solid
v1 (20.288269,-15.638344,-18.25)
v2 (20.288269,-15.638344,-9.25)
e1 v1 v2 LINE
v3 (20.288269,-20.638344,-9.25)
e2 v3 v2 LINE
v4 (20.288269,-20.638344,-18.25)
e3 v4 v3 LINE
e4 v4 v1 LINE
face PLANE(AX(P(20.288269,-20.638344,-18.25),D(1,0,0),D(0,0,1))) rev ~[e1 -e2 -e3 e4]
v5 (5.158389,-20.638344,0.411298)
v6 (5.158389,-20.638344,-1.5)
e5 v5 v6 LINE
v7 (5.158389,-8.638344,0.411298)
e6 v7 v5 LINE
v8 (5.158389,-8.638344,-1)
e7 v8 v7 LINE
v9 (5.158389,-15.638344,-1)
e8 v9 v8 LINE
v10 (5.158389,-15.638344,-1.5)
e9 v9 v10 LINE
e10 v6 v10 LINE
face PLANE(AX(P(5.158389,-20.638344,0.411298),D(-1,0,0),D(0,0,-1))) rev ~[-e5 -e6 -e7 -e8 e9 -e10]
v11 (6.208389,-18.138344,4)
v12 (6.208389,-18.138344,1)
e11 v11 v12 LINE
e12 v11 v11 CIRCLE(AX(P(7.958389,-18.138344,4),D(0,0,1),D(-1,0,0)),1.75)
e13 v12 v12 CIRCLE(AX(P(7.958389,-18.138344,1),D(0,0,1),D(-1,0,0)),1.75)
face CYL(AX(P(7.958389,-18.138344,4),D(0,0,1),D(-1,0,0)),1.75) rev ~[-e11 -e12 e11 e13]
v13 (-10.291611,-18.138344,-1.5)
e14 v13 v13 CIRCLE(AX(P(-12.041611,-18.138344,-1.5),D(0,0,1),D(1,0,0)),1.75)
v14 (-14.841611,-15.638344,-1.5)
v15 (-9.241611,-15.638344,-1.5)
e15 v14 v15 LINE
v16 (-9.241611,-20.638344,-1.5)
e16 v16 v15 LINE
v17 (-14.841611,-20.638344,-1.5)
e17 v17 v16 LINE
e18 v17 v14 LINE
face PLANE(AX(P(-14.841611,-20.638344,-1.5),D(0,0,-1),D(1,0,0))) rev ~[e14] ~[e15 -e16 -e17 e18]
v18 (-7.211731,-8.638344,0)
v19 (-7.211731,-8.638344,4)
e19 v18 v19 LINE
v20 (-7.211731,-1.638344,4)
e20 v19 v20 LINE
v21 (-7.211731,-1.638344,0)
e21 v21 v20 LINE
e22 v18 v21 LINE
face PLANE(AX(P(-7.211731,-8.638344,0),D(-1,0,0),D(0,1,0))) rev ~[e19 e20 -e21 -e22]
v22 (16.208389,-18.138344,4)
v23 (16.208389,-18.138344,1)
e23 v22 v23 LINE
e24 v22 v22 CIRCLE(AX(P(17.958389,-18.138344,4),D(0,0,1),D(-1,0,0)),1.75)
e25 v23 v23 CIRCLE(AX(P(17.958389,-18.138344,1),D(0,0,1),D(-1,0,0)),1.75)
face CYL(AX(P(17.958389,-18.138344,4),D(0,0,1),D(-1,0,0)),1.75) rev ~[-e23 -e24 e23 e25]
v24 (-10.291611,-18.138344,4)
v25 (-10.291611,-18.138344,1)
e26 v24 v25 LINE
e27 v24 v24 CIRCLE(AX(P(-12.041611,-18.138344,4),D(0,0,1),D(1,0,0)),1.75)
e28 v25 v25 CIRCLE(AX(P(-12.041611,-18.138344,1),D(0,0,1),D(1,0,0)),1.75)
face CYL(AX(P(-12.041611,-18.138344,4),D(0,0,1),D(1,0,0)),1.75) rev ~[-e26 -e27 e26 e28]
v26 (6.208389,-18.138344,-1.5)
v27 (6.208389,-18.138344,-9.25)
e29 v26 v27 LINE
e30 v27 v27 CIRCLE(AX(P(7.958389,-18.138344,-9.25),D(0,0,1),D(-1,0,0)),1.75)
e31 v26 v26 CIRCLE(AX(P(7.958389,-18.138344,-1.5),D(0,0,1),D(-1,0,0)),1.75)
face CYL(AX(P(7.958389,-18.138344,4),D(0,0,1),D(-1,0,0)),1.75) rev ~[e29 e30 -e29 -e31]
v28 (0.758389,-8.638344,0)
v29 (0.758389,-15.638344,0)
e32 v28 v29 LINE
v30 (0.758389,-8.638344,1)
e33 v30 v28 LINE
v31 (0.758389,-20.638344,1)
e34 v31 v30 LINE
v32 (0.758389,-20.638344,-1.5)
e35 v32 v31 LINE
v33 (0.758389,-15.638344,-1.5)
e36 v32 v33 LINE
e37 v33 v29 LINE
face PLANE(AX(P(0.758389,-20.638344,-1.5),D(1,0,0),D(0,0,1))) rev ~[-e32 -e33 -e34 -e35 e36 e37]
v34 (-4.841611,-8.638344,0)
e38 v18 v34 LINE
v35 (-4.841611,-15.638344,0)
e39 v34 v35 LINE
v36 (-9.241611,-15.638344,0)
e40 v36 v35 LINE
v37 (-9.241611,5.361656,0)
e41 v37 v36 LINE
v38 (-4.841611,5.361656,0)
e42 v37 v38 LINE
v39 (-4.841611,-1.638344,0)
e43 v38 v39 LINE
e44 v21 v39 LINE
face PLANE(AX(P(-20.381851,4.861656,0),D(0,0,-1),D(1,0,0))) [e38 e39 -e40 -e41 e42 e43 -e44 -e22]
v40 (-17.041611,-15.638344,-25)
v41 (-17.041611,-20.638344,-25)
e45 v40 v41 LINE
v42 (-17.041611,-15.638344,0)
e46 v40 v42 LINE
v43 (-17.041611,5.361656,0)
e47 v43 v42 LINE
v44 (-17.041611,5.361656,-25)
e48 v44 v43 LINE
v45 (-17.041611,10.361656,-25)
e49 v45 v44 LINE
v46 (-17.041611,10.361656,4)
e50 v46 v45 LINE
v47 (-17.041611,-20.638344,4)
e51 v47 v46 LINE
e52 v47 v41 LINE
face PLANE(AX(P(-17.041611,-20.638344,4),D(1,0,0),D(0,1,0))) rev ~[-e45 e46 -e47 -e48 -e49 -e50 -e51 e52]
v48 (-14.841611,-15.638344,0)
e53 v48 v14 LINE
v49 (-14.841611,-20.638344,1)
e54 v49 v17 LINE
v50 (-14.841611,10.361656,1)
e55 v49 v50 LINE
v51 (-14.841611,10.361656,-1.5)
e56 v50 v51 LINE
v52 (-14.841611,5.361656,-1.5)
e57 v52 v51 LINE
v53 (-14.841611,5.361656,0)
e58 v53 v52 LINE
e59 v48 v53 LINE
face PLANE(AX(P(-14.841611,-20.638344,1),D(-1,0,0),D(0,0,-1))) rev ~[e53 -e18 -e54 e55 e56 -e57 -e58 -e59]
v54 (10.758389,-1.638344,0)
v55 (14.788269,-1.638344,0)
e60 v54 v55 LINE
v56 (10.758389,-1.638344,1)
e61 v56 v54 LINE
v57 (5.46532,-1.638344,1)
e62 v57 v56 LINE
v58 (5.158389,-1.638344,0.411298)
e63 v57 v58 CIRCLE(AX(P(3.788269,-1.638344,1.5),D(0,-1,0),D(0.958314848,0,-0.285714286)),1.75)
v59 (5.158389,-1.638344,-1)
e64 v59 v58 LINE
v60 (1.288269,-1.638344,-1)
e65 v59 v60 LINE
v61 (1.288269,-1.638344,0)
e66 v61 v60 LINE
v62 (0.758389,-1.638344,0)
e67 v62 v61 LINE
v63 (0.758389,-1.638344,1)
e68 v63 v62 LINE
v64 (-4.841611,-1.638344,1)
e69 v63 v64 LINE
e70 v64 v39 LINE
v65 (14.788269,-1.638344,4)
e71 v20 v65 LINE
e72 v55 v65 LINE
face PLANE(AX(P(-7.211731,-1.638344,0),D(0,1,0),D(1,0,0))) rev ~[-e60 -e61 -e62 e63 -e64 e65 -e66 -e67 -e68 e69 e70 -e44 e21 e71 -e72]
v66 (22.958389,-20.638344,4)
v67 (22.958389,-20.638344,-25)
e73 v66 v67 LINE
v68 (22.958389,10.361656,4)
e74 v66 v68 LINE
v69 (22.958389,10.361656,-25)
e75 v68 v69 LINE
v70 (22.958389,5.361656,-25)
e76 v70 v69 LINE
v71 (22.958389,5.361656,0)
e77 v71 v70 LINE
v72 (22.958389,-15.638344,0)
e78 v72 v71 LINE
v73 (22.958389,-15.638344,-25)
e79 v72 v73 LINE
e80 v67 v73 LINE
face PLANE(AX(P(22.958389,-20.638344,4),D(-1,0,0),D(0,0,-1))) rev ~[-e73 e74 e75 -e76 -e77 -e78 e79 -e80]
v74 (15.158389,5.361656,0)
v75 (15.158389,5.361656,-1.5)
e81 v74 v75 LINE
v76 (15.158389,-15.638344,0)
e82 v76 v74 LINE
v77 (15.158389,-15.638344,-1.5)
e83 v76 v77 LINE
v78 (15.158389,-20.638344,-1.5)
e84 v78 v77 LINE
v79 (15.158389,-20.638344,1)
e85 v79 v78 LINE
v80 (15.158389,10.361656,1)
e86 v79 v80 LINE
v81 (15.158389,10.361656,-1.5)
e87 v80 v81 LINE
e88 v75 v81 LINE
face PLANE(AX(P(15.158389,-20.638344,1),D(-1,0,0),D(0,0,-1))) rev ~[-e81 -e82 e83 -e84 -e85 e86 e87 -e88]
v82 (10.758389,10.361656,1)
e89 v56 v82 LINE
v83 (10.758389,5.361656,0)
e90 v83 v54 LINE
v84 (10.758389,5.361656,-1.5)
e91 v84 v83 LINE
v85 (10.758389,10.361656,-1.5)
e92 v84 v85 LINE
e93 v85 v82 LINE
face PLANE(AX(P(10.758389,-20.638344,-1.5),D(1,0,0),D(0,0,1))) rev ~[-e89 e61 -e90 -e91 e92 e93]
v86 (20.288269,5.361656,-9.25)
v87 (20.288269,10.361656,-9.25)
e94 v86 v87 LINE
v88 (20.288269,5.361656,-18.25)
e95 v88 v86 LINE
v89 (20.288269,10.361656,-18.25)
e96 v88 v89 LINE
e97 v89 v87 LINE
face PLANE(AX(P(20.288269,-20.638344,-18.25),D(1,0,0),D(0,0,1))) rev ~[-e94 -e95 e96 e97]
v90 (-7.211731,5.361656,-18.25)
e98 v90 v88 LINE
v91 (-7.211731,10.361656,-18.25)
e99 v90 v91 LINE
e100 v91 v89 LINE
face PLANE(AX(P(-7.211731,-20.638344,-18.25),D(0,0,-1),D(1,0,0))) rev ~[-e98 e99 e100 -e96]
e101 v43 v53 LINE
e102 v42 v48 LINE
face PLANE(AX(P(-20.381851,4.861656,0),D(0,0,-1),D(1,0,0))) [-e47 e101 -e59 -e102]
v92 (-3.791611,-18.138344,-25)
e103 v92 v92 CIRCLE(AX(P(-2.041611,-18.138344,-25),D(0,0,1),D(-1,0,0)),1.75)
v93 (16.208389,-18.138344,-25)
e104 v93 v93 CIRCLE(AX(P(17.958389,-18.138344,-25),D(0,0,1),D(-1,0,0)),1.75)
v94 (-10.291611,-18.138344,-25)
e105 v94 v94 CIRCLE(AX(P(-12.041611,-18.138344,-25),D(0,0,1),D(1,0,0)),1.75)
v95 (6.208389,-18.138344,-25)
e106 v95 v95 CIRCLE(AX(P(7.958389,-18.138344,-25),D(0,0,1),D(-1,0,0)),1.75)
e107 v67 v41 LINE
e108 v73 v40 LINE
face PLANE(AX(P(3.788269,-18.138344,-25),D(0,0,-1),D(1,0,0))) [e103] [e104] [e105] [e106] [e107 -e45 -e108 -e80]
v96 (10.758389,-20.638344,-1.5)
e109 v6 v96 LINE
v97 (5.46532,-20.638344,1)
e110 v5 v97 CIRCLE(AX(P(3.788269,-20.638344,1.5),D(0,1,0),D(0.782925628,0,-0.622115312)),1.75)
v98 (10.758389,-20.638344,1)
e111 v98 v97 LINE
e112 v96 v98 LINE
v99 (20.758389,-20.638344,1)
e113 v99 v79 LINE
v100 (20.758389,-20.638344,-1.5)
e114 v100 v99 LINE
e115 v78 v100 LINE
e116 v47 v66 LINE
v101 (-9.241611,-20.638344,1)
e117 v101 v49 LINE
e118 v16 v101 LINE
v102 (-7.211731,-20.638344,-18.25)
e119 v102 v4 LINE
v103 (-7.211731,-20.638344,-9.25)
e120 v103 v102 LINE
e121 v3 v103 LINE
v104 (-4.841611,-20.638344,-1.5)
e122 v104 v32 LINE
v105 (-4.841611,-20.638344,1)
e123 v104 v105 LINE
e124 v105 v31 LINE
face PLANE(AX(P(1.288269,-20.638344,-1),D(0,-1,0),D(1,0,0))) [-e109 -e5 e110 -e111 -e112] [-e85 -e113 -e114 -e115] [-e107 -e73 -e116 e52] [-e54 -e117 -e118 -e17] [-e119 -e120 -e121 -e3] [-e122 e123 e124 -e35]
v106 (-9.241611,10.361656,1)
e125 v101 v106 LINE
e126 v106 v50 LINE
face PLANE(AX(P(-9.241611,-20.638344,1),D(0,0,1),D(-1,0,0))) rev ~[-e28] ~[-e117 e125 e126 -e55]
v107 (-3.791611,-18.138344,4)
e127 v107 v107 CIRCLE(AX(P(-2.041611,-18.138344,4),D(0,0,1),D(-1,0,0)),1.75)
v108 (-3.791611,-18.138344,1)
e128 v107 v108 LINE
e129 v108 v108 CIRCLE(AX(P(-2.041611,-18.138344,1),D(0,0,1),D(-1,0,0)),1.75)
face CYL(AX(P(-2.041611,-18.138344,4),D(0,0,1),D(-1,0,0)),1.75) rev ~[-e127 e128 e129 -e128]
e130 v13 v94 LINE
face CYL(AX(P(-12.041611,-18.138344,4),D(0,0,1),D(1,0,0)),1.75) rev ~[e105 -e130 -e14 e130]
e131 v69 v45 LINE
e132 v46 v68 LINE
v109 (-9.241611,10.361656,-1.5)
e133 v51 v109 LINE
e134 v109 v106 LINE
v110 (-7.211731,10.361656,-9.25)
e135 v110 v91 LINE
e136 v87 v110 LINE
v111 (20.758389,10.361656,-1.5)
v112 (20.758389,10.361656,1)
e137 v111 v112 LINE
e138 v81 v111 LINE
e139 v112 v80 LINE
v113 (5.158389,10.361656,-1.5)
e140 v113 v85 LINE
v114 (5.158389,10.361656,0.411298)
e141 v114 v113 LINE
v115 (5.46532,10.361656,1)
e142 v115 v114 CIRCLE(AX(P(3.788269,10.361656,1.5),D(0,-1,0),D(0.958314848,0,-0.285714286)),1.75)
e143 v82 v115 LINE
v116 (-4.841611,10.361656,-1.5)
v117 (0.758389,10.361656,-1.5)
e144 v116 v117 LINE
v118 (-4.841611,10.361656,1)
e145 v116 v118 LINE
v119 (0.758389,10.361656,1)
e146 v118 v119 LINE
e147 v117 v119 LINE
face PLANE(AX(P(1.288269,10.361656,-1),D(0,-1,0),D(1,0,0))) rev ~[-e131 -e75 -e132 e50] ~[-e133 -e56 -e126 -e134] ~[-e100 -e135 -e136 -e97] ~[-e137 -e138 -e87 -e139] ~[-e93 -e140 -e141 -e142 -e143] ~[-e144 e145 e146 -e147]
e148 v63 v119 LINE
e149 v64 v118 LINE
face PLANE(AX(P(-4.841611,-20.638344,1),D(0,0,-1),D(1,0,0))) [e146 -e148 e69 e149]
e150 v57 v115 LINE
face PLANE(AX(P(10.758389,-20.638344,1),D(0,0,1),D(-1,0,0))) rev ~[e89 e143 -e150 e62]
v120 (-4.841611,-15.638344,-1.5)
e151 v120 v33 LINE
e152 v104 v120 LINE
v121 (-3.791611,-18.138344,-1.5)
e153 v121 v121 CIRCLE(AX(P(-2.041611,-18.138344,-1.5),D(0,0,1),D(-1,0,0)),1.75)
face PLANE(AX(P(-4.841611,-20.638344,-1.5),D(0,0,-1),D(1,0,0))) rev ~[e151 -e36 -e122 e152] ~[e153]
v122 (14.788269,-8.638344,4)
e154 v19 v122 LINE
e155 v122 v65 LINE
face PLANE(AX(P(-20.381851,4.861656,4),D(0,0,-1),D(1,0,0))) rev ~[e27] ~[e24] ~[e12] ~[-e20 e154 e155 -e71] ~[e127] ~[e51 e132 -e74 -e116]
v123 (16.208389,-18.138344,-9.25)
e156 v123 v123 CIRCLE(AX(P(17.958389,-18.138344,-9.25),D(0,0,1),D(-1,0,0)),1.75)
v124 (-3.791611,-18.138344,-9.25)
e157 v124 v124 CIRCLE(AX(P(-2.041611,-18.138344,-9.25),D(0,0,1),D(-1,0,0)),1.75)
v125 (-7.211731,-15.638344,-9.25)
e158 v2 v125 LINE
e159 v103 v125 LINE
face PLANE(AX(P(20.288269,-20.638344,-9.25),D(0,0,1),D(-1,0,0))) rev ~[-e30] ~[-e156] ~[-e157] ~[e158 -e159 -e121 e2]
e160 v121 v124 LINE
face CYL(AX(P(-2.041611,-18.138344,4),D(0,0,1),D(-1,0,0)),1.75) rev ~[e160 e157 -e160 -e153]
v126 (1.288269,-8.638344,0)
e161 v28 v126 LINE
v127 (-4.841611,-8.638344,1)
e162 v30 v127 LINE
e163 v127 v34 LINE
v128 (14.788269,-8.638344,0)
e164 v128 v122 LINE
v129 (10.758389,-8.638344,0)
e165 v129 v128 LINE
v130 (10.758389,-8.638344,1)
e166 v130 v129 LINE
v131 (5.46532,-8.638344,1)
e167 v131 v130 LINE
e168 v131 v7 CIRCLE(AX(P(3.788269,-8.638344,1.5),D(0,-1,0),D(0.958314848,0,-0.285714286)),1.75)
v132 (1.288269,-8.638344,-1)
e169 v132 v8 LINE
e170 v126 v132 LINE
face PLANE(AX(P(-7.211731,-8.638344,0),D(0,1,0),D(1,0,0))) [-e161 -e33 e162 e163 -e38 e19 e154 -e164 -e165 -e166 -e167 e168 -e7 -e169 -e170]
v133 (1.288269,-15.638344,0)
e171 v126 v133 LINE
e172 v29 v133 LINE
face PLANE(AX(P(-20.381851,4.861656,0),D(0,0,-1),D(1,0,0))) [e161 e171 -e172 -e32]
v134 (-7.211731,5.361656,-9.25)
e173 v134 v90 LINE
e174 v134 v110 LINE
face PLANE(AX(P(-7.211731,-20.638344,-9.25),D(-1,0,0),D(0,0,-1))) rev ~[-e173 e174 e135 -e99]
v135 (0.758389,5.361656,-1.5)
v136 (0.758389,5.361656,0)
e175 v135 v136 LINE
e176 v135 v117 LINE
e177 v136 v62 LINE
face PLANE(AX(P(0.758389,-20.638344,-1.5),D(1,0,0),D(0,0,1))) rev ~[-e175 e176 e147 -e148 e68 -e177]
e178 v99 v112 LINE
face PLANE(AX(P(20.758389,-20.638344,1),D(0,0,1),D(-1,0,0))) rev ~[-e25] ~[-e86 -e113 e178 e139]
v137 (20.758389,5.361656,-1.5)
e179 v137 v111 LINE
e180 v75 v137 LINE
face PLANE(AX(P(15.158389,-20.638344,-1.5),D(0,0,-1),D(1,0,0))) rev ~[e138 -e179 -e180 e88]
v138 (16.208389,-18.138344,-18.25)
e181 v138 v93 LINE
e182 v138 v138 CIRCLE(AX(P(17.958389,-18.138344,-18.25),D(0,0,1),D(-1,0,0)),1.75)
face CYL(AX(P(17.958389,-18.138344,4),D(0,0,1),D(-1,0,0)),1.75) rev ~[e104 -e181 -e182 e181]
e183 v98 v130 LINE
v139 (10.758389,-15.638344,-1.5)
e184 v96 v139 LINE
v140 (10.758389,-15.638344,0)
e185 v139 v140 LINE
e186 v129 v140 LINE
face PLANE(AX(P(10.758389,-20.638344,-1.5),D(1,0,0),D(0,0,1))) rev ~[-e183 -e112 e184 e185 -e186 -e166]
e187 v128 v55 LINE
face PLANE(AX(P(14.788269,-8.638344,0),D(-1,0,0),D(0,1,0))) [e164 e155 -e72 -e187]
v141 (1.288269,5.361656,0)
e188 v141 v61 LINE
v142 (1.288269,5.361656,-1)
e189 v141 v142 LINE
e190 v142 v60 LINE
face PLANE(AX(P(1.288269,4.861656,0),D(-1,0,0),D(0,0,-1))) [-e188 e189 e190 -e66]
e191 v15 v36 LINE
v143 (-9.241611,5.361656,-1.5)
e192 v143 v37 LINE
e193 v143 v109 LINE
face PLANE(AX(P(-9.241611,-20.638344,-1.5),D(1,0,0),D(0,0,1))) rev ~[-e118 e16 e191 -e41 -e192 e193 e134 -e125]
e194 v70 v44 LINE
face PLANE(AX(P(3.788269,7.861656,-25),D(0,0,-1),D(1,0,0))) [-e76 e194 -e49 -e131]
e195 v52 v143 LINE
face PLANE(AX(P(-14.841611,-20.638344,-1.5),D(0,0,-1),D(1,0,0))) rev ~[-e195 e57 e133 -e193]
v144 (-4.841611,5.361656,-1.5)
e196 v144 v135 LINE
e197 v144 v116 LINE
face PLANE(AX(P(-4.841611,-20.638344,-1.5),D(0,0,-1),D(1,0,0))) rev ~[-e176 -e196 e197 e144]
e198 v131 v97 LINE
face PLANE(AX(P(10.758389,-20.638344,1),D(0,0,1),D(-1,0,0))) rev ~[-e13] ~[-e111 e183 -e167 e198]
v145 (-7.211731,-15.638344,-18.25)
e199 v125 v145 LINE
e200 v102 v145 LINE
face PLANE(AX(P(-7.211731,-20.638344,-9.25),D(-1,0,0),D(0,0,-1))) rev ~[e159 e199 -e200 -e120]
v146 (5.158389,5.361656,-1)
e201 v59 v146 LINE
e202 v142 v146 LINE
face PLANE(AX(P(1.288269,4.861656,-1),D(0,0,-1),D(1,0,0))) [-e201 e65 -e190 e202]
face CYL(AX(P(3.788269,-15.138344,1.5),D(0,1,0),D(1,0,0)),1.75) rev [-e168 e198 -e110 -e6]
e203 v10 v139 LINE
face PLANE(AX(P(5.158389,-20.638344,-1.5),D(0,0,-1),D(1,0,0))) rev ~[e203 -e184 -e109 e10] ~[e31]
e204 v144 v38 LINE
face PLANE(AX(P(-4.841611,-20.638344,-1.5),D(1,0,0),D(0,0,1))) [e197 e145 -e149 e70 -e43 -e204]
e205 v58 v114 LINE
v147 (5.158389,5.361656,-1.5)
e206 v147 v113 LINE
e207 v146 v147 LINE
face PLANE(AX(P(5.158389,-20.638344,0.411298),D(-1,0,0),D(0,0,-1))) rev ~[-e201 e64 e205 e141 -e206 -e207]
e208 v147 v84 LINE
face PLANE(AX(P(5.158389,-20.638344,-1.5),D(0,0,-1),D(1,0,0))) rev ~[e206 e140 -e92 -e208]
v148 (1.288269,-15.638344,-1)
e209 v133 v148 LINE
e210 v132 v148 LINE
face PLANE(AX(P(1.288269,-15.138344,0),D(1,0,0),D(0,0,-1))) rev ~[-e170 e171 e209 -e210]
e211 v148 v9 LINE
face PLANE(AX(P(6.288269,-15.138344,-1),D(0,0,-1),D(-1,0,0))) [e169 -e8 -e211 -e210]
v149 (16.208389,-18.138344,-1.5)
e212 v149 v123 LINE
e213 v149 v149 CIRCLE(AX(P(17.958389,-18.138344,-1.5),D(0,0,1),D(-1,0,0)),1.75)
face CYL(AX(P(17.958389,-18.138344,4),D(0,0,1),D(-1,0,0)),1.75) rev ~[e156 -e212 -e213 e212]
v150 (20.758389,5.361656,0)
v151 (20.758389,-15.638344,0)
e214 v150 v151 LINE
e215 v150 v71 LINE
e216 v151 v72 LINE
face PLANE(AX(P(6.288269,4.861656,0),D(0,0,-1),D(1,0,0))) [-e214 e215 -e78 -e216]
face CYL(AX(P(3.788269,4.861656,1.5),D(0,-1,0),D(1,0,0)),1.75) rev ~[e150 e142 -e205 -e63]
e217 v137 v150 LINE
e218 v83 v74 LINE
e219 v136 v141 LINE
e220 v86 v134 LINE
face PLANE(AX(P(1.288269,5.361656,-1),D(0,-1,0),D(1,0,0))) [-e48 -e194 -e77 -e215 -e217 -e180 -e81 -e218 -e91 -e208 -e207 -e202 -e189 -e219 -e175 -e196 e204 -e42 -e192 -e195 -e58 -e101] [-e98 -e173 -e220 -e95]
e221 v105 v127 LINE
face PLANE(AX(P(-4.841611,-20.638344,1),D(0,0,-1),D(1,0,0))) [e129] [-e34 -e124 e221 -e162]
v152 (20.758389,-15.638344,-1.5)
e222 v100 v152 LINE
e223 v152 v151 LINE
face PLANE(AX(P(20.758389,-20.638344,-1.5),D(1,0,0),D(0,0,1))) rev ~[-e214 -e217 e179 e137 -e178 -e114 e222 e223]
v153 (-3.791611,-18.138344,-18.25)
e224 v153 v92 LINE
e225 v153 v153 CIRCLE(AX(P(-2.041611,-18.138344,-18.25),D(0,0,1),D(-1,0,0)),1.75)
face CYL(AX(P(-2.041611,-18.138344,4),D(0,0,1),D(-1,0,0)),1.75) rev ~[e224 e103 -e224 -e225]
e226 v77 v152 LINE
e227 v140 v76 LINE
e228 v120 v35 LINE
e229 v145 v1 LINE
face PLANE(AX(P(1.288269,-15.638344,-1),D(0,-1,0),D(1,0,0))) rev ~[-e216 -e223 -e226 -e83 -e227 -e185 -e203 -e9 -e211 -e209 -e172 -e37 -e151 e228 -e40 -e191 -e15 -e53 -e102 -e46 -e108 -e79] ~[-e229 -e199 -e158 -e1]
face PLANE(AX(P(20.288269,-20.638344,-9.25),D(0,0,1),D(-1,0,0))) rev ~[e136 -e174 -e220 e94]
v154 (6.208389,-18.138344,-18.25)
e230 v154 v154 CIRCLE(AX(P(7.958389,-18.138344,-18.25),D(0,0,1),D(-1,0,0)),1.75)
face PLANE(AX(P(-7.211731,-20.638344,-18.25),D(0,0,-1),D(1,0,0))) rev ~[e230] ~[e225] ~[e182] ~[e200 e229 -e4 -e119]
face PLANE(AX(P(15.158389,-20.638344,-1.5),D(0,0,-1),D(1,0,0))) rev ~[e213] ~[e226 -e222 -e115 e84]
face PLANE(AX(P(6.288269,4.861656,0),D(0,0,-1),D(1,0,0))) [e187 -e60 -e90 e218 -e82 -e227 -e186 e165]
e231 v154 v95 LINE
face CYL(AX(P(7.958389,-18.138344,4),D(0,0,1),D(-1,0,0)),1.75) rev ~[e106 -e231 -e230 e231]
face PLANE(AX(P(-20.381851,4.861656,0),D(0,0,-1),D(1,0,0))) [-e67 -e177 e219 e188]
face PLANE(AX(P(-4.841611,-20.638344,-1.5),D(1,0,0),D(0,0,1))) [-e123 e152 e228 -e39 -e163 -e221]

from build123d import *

# Parameters (mm, degrees)
F0_W      = 48.3402396964
F0_H      = 20
F0_W_2    = 22
F0_H_2    = 7
F1_DEPTH  = 4
F3_DEPTH  = 1
F4_R      = 1.75
F5_DEPTH  = 20.001
F6_DEPTH  = 5.5
F7_DEPTH  = 5.5
F8_W      = 21.6701198482
F8_H      = 5
F9_DEPTH  = 25
F10_W     = 21.6701198482
F10_H     = 5
F11_DEPTH = 25
F12_W     = 5
F12_H     = 5
F13_DEPTH = 24
F14_W     = 5
F14_H     = 5
F15_DEPTH = 24
F16_W     = 11
F16_H     = 4.5
F17_DEPTH = 31.001
F19_DEPTH = 29.001
F18_R     = 1.75
F20_DEPTH = 10
F21_W     = 5.6
F21_H     = 2.5
F22_DEPTH = 31.001
F23_DEPTH = 29.001


# Not quite as in the source:
# - a feature names something its author has since deleted; it is built from what else it names


with BuildPart() as f1:
    # F0 (on Top) → F1 (new body)
    with BuildSketch(Plane.XY):
        with Locations((3.7882691845, -5.1383437738)):
            Rectangle(F0_W, F0_H)
        with Locations((3.7882691845, -5.1383437738)):
            Rectangle(F0_W_2, F0_H_2, mode=Mode.SUBTRACT)
    extrude(amount=F1_DEPTH)

    # F2 (on face) → F3 (join)
    with BuildSketch(Plane(origin=(0, 0, 0), x_dir=(1, 0, 0), z_dir=(0, 0, -1))):
        Polygon((6.2882691845, 1.6383437738), (3.7882691845, 1.6383437738), (1.2882691845, 1.6383437738), (1.2882691845, -4.8616562262), (6.2882691845, -4.8616562262), align=None)
        Polygon((1.2882691845, 8.6383437738), (3.7882691845, 8.6383437738), (6.2882691845, 8.6383437738), (6.2882691845, 15.1383437738), (1.2882691845, 15.1383437738), align=None)
    extrude(amount=F3_DEPTH)

    # F4 (on face) → F5 (cut, through all)
    with BuildSketch(Plane.XZ.offset(15.1383437738)):
        with Locations((3.7882691845, 1.5)):
            Circle(F4_R)
    extrude(amount=-F5_DEPTH, mode=Mode.SUBTRACT)

    # F6 (add): a face of the model
    f6_faces = [f1.faces().sort_by_distance(p)[0] for p in [
        (-19.8958693087, -15.1383437738, 2),
    ]]
    extrude(f6_faces, amount=F6_DEPTH)

    # F7 (add): a face of the model
    f7_faces = [f1.faces().sort_by_distance(p)[0] for p in [
        (27.4724076777, 4.8616562262, 2),
    ]]
    extrude(f7_faces, amount=F7_DEPTH)

    # F8 (on face) → F9 (join)
    with BuildSketch(Plane(origin=(0, 0, 0), x_dir=(1, 0, 0), z_dir=(0, 0, -1))):
        with Locations((17.1233291086, -7.8616562262)):
            Rectangle(F8_W, F8_H)
        with Locations((17.1233291086, 18.1383437738)):
            Rectangle(F8_W, F8_H)
    extrude(amount=F9_DEPTH)

    # F10 (on face) → F11 (join)
    with BuildSketch(Plane(origin=(0, 0, 0), x_dir=(1, 0, 0), z_dir=(0, 0, -1))):
        with Locations((-9.5467907396, 18.1383437738)):
            Rectangle(F10_W, F10_H)
        with Locations((-9.5467907396, -7.8616562262)):
            Rectangle(F10_W, F10_H)
    extrude(amount=F11_DEPTH)

    # F12 (on face) → F13 (join)
    with BuildSketch(Plane(origin=(0, 0, -1), x_dir=(1, 0, 0), z_dir=(0, 0, -1))):
        with Locations((3.7882691845, 18.1383437738)):
            Rectangle(F12_W, F12_H)
    extrude(amount=F13_DEPTH)

    # F14 (on face) → F15 (join)
    with BuildSketch(Plane(origin=(0, 0, -1), x_dir=(1, 0, 0), z_dir=(0, 0, -1))):
        with Locations((3.7882691845, -7.8616562262)):
            Rectangle(F14_W, F14_H)
    extrude(amount=F15_DEPTH)

    # F16 (on face) → F17 (cut, through all)
    with BuildSketch(Plane.XZ.offset(20.6383437738)):
        with Locations((9.2882691845, -16)):
            Rectangle(F16_W, F16_H)
        Polygon((3.7882691845, -18.25), (3.7882691845, -13.75), (14.7882691845, -13.75), (14.7882691845, -9.25), (-7.2117308155, -9.25), (-7.2117308155, -18.25), align=None)
        Polygon((14.7882691845, -9.25), (14.7882691845, -13.75), (14.7882691845, -18.25), (20.2882691845, -18.25), (20.2882691845, -9.25), align=None)
    extrude(amount=-F17_DEPTH, mode=Mode.SUBTRACT)

    # F18 (on face) → F19 (cut, through all)
    with BuildSketch(Plane.XY.offset(4)):
        Polygon((-20.3818506637, -20.6383437738), (-17.0416109673, -20.6383437738), (-17.0416109673, -5.1383437738), (-17.0416109673, 10.3616562262), (-20.3818506637, 10.3616562262), align=None)
    extrude(amount=-F19_DEPTH, mode=Mode.SUBTRACT)

    # F18 (on face) → F20 (cut)
    with BuildSketch(Plane.XY.offset(4)):
        with Locations((-12.0416109673, -18.1383437738)):
            Circle(F18_R)
    extrude(amount=-F20_DEPTH, mode=Mode.SUBTRACT)

    # F21 (on face) → F22 (cut, through all)
    with BuildSketch(Plane.XZ.offset(20.6383437738)):
        Polygon((-12.0416109673, 1), (-14.8416109673, 1), (-14.8416109673, -1.5), (-9.2416109673, -1.5), (-9.2416109673, 1), align=None)
        Polygon((27.9583890327, 4), (22.9583890327, 4), (22.9583890327, 1), (22.9583890327, -25), (27.9583890327, -25), align=None)
        with Locations((-2.0416109673, -0.25)):
            Rectangle(F21_W, F21_H)
        with BuildLine():
            Line((5.1583890327, 0.4112982035), (5.1583890327, -1.5))
            Line((5.1583890327, -1.5), (10.7583890327, -1.5))
            Line((10.7583890327, -1.5), (10.7583890327, 1))
            Line((10.7583890327, 1), (5.4653201677, 1))
            ThreePointArc((5.4653201677, 1), (5.3400278546, 0.6909604275), (5.1583890327, 0.4112982035))
        make_face()
        Polygon((20.7583890327, -1.5), (20.7583890327, 1), (17.9583890327, 1), (15.1583890327, 1), (15.1583890327, -1.5), align=None)
    extrude(amount=-F22_DEPTH, mode=Mode.SUBTRACT)

    # F18 (on face) → F23 (cut, through all)
    with BuildSketch(Plane.XY.offset(4)):
        Polygon((-17.0416109673, -20.6383437738), (-17.0416109673, -5.1383437738), (-17.0416109673, 10.3616562262), (-20.3818506637, 10.3616562262), (-20.3818506637, -20.6383437738), align=None)
        with Locations((-12.0416109673, -18.1383437738)):
            Circle(F18_R)
        with BuildLine():
            ThreePointArc((19.7083890327, -18.1383437738), (17.9583890327, -16.3883437738), (16.2083890327, -18.1383437738))
            ThreePointArc((16.2083890327, -18.1383437738), (17.9583890327, -19.8883437738), (19.7083890327, -18.1383437738))
        make_face()
        with BuildLine():
            ThreePointArc((9.7083890327, -18.1383437738), (7.9583890327, -16.3883437738), (6.2083890327, -18.1383437738))
            Line((6.2083890327, -18.1383437738), (7.9583890327, -18.1383437738))
            Line((7.9583890327, -18.1383437738), (9.7083890327, -18.1383437738))
        make_face()
        with BuildLine():
            Line((7.9583890327, -18.1383437738), (6.2083890327, -18.1383437738))
            ThreePointArc((6.2083890327, -18.1383437738), (7.9583890327, -19.8883437738), (9.7083890327, -18.1383437738))
            Line((9.7083890327, -18.1383437738), (7.9583890327, -18.1383437738))
        make_face()
        with BuildLine():
            ThreePointArc((-0.2916109673, -18.1383437738), (-2.0416109673, -16.3883437738), (-3.7916109673, -18.1383437738))
            Line((-3.7916109673, -18.1383437738), (-2.0416109673, -18.1383437738))
            Line((-2.0416109673, -18.1383437738), (-0.2916109673, -18.1383437738))
        make_face()
        with BuildLine():
            Line((-2.0416109673, -18.1383437738), (-3.7916109673, -18.1383437738))
            ThreePointArc((-3.7916109673, -18.1383437738), (-2.0416109673, -19.8883437738), (-0.2916109673, -18.1383437738))
            Line((-0.2916109673, -18.1383437738), (-2.0416109673, -18.1383437738))
        make_face()
    extrude(amount=-F23_DEPTH, mode=Mode.SUBTRACT)


solid = f1.part
